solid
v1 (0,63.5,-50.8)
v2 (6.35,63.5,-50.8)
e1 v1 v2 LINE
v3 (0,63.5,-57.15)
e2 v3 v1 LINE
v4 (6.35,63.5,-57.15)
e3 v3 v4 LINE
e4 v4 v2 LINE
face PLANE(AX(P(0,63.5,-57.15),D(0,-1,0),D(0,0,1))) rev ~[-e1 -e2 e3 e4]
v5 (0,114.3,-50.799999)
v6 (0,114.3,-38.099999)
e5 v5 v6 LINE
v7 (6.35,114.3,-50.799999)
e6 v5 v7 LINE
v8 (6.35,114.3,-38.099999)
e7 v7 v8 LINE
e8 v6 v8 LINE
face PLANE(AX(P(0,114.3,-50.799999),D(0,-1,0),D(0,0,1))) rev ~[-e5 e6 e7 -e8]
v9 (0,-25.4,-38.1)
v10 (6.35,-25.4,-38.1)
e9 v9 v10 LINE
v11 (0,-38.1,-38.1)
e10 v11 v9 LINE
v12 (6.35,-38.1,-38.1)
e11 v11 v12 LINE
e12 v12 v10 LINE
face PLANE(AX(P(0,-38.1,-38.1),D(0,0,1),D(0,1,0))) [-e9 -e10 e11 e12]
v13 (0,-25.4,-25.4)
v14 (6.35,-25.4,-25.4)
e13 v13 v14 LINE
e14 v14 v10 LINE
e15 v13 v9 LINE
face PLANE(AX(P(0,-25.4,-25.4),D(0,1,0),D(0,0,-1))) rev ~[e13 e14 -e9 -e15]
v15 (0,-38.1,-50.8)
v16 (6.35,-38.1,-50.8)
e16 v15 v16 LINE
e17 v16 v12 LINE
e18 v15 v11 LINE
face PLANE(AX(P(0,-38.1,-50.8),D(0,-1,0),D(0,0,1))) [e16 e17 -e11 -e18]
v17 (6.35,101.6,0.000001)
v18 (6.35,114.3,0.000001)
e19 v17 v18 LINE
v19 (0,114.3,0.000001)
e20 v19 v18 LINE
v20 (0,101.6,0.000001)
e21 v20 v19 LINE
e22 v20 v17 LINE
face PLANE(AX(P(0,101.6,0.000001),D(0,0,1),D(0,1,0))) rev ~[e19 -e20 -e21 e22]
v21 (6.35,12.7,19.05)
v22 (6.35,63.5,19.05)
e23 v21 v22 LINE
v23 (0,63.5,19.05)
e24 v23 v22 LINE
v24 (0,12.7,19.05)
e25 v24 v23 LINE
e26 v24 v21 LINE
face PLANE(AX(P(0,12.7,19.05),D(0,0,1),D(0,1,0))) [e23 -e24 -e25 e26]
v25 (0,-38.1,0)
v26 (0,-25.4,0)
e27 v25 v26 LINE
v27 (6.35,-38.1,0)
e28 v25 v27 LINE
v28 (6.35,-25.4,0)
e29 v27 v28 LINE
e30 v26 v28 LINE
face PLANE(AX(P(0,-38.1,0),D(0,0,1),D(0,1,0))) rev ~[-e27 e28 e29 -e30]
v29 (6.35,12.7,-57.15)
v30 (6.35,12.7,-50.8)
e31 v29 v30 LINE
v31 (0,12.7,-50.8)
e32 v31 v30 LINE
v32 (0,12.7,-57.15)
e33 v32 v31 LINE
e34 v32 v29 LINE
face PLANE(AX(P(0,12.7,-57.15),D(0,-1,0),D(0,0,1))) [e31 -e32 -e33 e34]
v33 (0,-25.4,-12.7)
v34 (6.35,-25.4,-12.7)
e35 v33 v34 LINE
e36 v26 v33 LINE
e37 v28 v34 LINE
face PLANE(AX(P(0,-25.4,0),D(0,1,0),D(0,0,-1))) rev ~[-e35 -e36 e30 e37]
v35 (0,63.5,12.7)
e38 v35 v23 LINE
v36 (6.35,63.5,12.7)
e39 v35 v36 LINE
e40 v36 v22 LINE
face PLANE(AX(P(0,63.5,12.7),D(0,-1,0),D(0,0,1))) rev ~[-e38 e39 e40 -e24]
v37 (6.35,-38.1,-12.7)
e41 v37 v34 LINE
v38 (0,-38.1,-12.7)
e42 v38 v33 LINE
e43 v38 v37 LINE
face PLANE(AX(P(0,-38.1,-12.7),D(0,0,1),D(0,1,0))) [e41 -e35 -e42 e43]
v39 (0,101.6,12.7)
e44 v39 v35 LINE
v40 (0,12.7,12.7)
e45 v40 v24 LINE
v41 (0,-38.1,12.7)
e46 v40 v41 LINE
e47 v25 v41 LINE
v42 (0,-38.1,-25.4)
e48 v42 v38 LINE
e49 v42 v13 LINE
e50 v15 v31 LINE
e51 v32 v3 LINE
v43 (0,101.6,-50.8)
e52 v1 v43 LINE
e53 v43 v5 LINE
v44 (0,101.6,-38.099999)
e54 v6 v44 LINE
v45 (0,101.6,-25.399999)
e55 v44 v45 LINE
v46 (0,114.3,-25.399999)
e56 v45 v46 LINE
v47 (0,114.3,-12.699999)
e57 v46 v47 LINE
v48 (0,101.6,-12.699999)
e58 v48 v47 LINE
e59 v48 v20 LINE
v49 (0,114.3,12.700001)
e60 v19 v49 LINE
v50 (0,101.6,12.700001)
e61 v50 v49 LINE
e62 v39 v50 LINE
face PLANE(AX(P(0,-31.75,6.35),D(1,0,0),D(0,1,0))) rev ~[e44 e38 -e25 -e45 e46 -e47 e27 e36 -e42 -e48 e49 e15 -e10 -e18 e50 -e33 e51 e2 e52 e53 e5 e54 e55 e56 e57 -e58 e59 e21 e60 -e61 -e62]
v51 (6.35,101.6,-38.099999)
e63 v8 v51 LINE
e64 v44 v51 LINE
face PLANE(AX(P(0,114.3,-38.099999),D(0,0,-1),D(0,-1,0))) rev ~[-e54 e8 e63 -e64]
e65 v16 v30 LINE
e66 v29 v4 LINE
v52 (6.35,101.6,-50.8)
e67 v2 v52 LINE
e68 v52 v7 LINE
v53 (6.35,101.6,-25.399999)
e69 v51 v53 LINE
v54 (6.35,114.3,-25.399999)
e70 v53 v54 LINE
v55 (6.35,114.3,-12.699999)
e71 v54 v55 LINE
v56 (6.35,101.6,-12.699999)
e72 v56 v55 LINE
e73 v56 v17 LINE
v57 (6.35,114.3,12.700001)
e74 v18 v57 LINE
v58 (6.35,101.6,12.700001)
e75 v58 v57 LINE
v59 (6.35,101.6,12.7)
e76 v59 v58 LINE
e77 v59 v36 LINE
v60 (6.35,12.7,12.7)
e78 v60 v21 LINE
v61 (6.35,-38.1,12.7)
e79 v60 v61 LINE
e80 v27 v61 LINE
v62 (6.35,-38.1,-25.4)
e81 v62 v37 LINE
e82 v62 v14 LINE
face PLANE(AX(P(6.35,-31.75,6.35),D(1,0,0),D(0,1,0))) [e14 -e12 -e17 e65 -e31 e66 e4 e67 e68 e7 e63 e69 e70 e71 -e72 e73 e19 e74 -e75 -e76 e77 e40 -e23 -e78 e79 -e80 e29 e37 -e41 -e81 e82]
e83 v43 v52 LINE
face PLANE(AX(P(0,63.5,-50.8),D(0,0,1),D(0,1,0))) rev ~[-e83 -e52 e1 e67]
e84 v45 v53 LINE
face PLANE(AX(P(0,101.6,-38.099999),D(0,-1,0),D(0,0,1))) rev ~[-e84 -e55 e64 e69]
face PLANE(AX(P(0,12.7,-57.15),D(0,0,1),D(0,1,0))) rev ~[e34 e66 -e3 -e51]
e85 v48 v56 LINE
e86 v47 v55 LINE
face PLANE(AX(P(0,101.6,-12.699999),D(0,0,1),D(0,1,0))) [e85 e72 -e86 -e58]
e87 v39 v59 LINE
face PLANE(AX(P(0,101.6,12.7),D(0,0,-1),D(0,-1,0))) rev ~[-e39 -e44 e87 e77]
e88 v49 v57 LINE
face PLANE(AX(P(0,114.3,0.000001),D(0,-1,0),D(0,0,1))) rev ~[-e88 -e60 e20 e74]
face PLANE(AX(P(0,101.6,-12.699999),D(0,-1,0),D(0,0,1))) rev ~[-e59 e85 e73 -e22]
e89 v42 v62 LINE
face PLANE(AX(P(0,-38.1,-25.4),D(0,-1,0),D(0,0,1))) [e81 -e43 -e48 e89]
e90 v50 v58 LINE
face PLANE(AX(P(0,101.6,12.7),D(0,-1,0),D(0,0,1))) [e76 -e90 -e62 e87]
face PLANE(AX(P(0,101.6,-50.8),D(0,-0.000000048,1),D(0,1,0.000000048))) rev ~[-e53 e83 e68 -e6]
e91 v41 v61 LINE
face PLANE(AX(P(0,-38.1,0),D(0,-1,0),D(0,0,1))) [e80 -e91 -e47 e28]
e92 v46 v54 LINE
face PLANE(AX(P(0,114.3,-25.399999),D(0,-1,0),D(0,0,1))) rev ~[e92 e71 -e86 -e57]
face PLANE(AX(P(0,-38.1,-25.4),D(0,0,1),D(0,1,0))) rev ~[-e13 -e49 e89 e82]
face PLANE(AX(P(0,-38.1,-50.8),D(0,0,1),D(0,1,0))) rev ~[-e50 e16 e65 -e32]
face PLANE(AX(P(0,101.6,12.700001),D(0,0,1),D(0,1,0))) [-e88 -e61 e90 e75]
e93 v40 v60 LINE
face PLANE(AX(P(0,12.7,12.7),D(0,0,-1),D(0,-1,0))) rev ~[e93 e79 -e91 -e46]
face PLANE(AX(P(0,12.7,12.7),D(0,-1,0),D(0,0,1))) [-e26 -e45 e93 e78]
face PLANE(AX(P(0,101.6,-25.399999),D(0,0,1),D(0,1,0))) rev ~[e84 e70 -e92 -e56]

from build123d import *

# Parameters (mm, degrees)
F0_W     = 12.7
F0_H     = 12.7
F0_W_2   = 50.8
F0_H_2   = 6.35
F1_DEPTH = 6.35


# Not quite as in the source:
# - ends of sketch curves that miss each other by under 0.0002 mm in the source are joined


with BuildPart() as f1:
    # F0 (on Right) → F1 (new body)
    with BuildSketch(Plane.YZ):
        with Locations((-31.75, 6.35)):
            Rectangle(F0_W, F0_H)
        Polygon((12.7, 12.7), (-25.4, 12.7), (-25.4, 0), (-25.4, -12.7), (-25.4, -25.4), (-25.4, -38.1), (-25.4, -50.8), (12.7, -50.8), (63.5, -50.8), (101.6, -50.8), (101.6, -38.0999993861), (101.6, -25.3999993861), (101.6, -12.6999993861), (101.6, 6.139e-07), (101.6, 12.7), (63.5, 12.7), align=None)
        with Locations((-31.75, -19.05)):
            Rectangle(F0_W, F0_H)
        with Locations((-31.75, -44.45)):
            Rectangle(F0_W, F0_H)
        with Locations((38.1, -53.975)):
            Rectangle(F0_W_2, F0_H_2)
        with Locations((38.1, 15.875)):
            Rectangle(F0_W_2, F0_H_2)
        with Locations((107.95, 6.3500006139)):
            Rectangle(F0_W, F0_H)
        with Locations((107.95, -19.0499993861)):
            Rectangle(F0_W, F0_H)
        Polygon((114.3, -38.0999993861), (101.6, -38.0999993861), (101.6, -50.8), (114.3, -50.7999993861), align=None)
    extrude(amount=F1_DEPTH)


solid = f1.part
